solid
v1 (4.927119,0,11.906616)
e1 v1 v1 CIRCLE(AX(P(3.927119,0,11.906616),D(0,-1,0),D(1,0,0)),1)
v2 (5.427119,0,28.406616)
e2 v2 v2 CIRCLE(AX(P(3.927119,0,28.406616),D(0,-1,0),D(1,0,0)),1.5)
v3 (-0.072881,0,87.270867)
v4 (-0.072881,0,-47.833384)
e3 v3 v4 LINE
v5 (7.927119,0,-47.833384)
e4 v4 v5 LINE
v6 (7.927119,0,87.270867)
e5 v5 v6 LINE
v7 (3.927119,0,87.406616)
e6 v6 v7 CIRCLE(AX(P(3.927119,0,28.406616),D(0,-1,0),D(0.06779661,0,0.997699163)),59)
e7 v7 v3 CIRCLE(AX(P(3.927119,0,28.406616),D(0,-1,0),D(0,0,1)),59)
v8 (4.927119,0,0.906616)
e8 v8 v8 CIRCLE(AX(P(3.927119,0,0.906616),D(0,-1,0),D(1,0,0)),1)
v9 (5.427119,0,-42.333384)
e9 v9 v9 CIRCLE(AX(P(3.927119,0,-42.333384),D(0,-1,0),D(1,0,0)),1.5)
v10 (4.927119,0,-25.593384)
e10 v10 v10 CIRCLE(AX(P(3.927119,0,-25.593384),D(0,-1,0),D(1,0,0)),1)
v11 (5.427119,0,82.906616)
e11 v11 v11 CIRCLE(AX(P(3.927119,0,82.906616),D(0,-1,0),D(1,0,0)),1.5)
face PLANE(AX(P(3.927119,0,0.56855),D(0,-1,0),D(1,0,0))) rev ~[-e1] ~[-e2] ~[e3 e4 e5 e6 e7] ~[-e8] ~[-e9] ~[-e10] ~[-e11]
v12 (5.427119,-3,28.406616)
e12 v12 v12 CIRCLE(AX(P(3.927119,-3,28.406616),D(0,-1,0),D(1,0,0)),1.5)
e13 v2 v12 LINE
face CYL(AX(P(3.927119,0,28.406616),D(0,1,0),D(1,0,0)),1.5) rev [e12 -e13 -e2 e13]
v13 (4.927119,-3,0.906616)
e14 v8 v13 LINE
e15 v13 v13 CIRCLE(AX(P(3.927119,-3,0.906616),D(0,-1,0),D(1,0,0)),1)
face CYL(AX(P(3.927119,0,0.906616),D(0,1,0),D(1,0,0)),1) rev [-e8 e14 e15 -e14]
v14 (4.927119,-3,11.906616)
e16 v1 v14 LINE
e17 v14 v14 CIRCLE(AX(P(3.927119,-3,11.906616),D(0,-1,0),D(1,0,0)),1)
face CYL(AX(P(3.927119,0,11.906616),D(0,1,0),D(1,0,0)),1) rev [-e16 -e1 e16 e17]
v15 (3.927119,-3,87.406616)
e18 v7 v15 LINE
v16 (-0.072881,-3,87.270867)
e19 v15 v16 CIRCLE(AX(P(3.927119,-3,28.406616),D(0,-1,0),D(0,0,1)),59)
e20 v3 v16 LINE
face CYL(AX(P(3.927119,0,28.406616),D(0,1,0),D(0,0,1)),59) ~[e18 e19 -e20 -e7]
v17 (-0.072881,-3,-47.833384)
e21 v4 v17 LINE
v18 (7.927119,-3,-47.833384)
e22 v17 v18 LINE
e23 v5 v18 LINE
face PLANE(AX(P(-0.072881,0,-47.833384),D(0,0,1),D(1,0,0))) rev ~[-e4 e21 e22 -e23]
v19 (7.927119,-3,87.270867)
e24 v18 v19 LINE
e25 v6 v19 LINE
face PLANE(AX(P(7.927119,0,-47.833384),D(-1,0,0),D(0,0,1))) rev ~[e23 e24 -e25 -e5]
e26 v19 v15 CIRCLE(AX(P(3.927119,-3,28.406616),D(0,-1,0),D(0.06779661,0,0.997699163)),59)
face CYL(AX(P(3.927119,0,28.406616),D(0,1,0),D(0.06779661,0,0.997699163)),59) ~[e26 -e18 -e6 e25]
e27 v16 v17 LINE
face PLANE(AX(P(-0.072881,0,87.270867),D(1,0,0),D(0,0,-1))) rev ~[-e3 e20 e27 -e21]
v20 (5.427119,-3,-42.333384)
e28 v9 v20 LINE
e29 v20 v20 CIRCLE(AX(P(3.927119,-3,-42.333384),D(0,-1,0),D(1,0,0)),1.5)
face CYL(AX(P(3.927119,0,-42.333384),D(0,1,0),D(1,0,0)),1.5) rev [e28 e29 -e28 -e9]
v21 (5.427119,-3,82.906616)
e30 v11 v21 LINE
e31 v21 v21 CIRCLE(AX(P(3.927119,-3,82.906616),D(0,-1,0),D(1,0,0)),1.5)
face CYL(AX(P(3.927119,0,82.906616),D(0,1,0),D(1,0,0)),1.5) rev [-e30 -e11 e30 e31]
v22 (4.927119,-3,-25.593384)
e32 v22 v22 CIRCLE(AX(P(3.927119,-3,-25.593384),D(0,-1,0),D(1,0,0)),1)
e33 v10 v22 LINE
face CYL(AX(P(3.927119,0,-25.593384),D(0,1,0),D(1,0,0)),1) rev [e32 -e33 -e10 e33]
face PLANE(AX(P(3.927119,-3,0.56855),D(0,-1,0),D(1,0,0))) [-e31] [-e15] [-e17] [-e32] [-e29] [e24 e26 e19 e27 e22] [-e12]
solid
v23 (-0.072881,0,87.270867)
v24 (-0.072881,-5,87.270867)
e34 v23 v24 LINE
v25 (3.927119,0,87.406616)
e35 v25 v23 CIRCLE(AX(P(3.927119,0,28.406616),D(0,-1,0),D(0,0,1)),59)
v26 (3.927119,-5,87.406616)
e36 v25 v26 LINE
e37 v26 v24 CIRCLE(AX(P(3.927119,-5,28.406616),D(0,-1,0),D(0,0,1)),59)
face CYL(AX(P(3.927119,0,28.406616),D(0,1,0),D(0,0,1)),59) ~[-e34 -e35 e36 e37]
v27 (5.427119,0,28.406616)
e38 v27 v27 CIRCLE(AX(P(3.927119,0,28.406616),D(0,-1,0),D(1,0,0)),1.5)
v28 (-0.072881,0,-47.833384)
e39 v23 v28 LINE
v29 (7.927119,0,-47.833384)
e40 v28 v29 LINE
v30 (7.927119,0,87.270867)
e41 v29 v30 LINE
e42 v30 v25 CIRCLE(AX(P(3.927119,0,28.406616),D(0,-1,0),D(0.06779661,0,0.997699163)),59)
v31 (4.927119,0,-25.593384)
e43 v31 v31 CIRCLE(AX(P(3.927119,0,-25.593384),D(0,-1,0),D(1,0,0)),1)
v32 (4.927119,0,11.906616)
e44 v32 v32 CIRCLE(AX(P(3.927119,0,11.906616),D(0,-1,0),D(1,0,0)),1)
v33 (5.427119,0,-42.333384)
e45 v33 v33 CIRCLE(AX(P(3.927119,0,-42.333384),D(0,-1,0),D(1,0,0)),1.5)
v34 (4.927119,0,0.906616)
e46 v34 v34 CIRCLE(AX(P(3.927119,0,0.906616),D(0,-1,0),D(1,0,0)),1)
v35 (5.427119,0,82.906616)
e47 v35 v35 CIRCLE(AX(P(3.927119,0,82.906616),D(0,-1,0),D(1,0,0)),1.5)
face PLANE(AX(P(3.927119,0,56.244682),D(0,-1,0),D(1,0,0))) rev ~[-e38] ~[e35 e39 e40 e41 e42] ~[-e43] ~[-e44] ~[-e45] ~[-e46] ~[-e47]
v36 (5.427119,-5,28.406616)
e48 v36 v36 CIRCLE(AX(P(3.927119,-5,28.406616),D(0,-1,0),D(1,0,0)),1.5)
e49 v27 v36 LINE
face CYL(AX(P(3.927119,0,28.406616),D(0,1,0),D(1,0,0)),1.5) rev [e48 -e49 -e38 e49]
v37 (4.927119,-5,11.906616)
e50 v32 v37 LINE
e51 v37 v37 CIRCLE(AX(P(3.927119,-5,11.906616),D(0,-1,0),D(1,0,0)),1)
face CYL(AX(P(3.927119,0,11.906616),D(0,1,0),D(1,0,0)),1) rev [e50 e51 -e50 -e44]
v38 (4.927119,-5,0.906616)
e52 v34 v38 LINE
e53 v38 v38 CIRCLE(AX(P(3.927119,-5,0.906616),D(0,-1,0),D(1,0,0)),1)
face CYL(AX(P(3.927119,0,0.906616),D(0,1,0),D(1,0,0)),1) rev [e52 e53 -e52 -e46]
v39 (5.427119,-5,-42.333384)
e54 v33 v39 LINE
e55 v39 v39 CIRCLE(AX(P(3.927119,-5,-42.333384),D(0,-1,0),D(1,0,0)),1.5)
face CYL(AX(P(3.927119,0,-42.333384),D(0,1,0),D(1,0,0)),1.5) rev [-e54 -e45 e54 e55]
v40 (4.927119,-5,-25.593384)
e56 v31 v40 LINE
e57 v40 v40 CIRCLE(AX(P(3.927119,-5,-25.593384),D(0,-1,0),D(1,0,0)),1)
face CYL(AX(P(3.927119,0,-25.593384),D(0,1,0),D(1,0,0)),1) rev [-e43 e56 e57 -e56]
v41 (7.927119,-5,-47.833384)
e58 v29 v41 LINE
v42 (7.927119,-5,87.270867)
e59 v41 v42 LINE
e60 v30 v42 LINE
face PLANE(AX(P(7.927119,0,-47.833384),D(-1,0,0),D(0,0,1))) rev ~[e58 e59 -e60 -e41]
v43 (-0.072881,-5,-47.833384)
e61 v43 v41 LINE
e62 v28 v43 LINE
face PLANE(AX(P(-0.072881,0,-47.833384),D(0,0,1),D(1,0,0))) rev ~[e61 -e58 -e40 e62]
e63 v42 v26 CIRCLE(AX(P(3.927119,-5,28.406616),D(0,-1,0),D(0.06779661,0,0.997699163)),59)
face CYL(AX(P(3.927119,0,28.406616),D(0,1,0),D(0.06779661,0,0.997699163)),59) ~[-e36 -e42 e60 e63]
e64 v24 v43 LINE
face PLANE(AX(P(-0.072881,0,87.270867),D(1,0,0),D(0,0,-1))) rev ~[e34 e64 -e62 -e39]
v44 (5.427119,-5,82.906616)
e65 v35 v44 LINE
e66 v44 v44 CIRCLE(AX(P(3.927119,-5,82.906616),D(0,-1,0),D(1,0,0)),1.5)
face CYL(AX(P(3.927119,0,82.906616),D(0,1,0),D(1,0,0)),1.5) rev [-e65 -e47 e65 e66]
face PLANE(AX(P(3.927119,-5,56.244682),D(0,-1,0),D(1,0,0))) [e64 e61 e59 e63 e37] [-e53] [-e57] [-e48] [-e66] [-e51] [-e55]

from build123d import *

# Parameters (mm, degrees)
F0_W     = 8
F0_H     = 9.6326530612
F0_R     = 1.5
F0_R_2   = 1
F1_DEPTH = 5
F2_DEPTH = 3


# Not quite as in the source:
# - a feature names something its author has since deleted; it is built from what else it names


with BuildPart() as f1:
    # F0 (on Front) → F1 (new body)
    with BuildSketch(Plane.XZ):
        with BuildLine():
            Line((-0.072881, 79.2495112755), (-0.072881, 33.2229425306))
            Line((-0.072881, 33.2229425306), (7.927119, 33.2229425306))
            Line((7.927119, 33.2229425306), (7.927119, 79.2495112755))
            ThreePointArc((7.927119, 79.2495112755), (3.927119, 79.406616), (-0.072881, 79.2495112755))
        make_face()
        with Locations((3.927119, 28.406616)):
            Rectangle(F0_W, F0_H)
        with Locations((3.927119, 28.406616)):
            Circle(F0_R, mode=Mode.SUBTRACT)
        with BuildLine():
            Line((7.927119, 23.5902894694), (-0.072881, 23.5902894694))
            Line((-0.072881, 23.5902894694), (-0.072881, -22.4362792755))
            ThreePointArc((-0.072881, -22.4362792755), (3.927119, -22.593384), (7.927119, -22.4362792755))
            Line((7.927119, -22.4362792755), (7.927119, 23.5902894694))
        make_face()
        with Locations((3.927119, 0.906616)):
            Circle(F0_R_2, mode=Mode.SUBTRACT)
        with Locations((3.927119, 11.906616)):
            Circle(F0_R_2, mode=Mode.SUBTRACT)
        with BuildLine():
            Line((-0.072881, 87.270866611), (-0.072881, 79.2495112755))
            ThreePointArc((-0.072881, 79.2495112755), (3.927119, 79.406616), (7.927119, 79.2495112755))
            Line((7.927119, 79.2495112755), (7.927119, 87.270866611))
            ThreePointArc((7.927119, 87.270866611), (5.9282704121, 87.3726688866), (3.927119, 87.406616))
            ThreePointArc((3.927119, 87.406616), (1.9259675879, 87.3726688866), (-0.072881, 87.270866611))
        make_face()
        with Locations((3.927119, 82.906616)):
            Circle(F0_R, mode=Mode.SUBTRACT)
        with BuildLine():
            ThreePointArc((7.927119, -22.4362792755), (3.927119, -22.593384), (-0.072881, -22.4362792755))
            Line((-0.072881, -22.4362792755), (-0.072881, -30.457634611))
            ThreePointArc((-0.072881, -30.457634611), (3.927119, -30.593384), (7.927119, -30.457634611))
            Line((7.927119, -30.457634611), (7.927119, -22.4362792755))
        make_face()
        with Locations((3.927119, -25.593384)):
            Circle(F0_R_2, mode=Mode.SUBTRACT)
        with BuildLine():
            ThreePointArc((7.927119, -30.457634611), (3.927119, -30.593384), (-0.072881, -30.457634611))
            Line((-0.072881, -30.457634611), (-0.072881, -47.833384))
            Line((-0.072881, -47.833384), (7.927119, -47.833384))
            Line((7.927119, -47.833384), (7.927119, -30.457634611))
        make_face()
        with Locations((3.927119, -42.333384)):
            Circle(F0_R, mode=Mode.SUBTRACT)
    extrude(amount=F1_DEPTH)


with BuildPart() as f2:
    # F0 (on Front) → F2 (new body)
    with BuildSketch(Plane.XZ):
        with BuildLine():
            Line((7.927119, 23.5902894694), (-0.072881, 23.5902894694))
            Line((-0.072881, 23.5902894694), (-0.072881, -22.4362792755))
            ThreePointArc((-0.072881, -22.4362792755), (3.927119, -22.593384), (7.927119, -22.4362792755))
            Line((7.927119, -22.4362792755), (7.927119, 23.5902894694))
        make_face()
        with Locations((3.927119, 0.906616)):
            Circle(F0_R_2, mode=Mode.SUBTRACT)
        with Locations((3.927119, 11.906616)):
            Circle(F0_R_2, mode=Mode.SUBTRACT)
        with BuildLine():
            ThreePointArc((7.927119, -22.4362792755), (3.927119, -22.593384), (-0.072881, -22.4362792755))
            Line((-0.072881, -22.4362792755), (-0.072881, -30.457634611))
            ThreePointArc((-0.072881, -30.457634611), (3.927119, -30.593384), (7.927119, -30.457634611))
            Line((7.927119, -30.457634611), (7.927119, -22.4362792755))
        make_face()
        with Locations((3.927119, -25.593384)):
            Circle(F0_R_2, mode=Mode.SUBTRACT)
        with BuildLine():
            ThreePointArc((7.927119, -30.457634611), (3.927119, -30.593384), (-0.072881, -30.457634611))
            Line((-0.072881, -30.457634611), (-0.072881, -47.833384))
            Line((-0.072881, -47.833384), (7.927119, -47.833384))
            Line((7.927119, -47.833384), (7.927119, -30.457634611))
        make_face()
        with Locations((3.927119, -42.333384)):
            Circle(F0_R, mode=Mode.SUBTRACT)
        with Locations((3.927119, 28.406616)):
            Rectangle(F0_W, F0_H)
        with Locations((3.927119, 28.406616)):
            Circle(F0_R, mode=Mode.SUBTRACT)
        with BuildLine():
            Line((-0.072881, 79.2495112755), (-0.072881, 33.2229425306))
            Line((-0.072881, 33.2229425306), (7.927119, 33.2229425306))
            Line((7.927119, 33.2229425306), (7.927119, 79.2495112755))
            ThreePointArc((7.927119, 79.2495112755), (3.927119, 79.406616), (-0.072881, 79.2495112755))
        make_face()
        with BuildLine():
            Line((-0.072881, 87.270866611), (-0.072881, 79.2495112755))
            ThreePointArc((-0.072881, 79.2495112755), (3.927119, 79.406616), (7.927119, 79.2495112755))
            Line((7.927119, 79.2495112755), (7.927119, 87.270866611))
            ThreePointArc((7.927119, 87.270866611), (5.9282704121, 87.3726688866), (3.927119, 87.406616))
            ThreePointArc((3.927119, 87.406616), (1.9259675879, 87.3726688866), (-0.072881, 87.270866611))
        make_face()
        with Locations((3.927119, 82.906616)):
            Circle(F0_R, mode=Mode.SUBTRACT)
    extrude(amount=F2_DEPTH)


solid = Compound([f1.part, f2.part])
